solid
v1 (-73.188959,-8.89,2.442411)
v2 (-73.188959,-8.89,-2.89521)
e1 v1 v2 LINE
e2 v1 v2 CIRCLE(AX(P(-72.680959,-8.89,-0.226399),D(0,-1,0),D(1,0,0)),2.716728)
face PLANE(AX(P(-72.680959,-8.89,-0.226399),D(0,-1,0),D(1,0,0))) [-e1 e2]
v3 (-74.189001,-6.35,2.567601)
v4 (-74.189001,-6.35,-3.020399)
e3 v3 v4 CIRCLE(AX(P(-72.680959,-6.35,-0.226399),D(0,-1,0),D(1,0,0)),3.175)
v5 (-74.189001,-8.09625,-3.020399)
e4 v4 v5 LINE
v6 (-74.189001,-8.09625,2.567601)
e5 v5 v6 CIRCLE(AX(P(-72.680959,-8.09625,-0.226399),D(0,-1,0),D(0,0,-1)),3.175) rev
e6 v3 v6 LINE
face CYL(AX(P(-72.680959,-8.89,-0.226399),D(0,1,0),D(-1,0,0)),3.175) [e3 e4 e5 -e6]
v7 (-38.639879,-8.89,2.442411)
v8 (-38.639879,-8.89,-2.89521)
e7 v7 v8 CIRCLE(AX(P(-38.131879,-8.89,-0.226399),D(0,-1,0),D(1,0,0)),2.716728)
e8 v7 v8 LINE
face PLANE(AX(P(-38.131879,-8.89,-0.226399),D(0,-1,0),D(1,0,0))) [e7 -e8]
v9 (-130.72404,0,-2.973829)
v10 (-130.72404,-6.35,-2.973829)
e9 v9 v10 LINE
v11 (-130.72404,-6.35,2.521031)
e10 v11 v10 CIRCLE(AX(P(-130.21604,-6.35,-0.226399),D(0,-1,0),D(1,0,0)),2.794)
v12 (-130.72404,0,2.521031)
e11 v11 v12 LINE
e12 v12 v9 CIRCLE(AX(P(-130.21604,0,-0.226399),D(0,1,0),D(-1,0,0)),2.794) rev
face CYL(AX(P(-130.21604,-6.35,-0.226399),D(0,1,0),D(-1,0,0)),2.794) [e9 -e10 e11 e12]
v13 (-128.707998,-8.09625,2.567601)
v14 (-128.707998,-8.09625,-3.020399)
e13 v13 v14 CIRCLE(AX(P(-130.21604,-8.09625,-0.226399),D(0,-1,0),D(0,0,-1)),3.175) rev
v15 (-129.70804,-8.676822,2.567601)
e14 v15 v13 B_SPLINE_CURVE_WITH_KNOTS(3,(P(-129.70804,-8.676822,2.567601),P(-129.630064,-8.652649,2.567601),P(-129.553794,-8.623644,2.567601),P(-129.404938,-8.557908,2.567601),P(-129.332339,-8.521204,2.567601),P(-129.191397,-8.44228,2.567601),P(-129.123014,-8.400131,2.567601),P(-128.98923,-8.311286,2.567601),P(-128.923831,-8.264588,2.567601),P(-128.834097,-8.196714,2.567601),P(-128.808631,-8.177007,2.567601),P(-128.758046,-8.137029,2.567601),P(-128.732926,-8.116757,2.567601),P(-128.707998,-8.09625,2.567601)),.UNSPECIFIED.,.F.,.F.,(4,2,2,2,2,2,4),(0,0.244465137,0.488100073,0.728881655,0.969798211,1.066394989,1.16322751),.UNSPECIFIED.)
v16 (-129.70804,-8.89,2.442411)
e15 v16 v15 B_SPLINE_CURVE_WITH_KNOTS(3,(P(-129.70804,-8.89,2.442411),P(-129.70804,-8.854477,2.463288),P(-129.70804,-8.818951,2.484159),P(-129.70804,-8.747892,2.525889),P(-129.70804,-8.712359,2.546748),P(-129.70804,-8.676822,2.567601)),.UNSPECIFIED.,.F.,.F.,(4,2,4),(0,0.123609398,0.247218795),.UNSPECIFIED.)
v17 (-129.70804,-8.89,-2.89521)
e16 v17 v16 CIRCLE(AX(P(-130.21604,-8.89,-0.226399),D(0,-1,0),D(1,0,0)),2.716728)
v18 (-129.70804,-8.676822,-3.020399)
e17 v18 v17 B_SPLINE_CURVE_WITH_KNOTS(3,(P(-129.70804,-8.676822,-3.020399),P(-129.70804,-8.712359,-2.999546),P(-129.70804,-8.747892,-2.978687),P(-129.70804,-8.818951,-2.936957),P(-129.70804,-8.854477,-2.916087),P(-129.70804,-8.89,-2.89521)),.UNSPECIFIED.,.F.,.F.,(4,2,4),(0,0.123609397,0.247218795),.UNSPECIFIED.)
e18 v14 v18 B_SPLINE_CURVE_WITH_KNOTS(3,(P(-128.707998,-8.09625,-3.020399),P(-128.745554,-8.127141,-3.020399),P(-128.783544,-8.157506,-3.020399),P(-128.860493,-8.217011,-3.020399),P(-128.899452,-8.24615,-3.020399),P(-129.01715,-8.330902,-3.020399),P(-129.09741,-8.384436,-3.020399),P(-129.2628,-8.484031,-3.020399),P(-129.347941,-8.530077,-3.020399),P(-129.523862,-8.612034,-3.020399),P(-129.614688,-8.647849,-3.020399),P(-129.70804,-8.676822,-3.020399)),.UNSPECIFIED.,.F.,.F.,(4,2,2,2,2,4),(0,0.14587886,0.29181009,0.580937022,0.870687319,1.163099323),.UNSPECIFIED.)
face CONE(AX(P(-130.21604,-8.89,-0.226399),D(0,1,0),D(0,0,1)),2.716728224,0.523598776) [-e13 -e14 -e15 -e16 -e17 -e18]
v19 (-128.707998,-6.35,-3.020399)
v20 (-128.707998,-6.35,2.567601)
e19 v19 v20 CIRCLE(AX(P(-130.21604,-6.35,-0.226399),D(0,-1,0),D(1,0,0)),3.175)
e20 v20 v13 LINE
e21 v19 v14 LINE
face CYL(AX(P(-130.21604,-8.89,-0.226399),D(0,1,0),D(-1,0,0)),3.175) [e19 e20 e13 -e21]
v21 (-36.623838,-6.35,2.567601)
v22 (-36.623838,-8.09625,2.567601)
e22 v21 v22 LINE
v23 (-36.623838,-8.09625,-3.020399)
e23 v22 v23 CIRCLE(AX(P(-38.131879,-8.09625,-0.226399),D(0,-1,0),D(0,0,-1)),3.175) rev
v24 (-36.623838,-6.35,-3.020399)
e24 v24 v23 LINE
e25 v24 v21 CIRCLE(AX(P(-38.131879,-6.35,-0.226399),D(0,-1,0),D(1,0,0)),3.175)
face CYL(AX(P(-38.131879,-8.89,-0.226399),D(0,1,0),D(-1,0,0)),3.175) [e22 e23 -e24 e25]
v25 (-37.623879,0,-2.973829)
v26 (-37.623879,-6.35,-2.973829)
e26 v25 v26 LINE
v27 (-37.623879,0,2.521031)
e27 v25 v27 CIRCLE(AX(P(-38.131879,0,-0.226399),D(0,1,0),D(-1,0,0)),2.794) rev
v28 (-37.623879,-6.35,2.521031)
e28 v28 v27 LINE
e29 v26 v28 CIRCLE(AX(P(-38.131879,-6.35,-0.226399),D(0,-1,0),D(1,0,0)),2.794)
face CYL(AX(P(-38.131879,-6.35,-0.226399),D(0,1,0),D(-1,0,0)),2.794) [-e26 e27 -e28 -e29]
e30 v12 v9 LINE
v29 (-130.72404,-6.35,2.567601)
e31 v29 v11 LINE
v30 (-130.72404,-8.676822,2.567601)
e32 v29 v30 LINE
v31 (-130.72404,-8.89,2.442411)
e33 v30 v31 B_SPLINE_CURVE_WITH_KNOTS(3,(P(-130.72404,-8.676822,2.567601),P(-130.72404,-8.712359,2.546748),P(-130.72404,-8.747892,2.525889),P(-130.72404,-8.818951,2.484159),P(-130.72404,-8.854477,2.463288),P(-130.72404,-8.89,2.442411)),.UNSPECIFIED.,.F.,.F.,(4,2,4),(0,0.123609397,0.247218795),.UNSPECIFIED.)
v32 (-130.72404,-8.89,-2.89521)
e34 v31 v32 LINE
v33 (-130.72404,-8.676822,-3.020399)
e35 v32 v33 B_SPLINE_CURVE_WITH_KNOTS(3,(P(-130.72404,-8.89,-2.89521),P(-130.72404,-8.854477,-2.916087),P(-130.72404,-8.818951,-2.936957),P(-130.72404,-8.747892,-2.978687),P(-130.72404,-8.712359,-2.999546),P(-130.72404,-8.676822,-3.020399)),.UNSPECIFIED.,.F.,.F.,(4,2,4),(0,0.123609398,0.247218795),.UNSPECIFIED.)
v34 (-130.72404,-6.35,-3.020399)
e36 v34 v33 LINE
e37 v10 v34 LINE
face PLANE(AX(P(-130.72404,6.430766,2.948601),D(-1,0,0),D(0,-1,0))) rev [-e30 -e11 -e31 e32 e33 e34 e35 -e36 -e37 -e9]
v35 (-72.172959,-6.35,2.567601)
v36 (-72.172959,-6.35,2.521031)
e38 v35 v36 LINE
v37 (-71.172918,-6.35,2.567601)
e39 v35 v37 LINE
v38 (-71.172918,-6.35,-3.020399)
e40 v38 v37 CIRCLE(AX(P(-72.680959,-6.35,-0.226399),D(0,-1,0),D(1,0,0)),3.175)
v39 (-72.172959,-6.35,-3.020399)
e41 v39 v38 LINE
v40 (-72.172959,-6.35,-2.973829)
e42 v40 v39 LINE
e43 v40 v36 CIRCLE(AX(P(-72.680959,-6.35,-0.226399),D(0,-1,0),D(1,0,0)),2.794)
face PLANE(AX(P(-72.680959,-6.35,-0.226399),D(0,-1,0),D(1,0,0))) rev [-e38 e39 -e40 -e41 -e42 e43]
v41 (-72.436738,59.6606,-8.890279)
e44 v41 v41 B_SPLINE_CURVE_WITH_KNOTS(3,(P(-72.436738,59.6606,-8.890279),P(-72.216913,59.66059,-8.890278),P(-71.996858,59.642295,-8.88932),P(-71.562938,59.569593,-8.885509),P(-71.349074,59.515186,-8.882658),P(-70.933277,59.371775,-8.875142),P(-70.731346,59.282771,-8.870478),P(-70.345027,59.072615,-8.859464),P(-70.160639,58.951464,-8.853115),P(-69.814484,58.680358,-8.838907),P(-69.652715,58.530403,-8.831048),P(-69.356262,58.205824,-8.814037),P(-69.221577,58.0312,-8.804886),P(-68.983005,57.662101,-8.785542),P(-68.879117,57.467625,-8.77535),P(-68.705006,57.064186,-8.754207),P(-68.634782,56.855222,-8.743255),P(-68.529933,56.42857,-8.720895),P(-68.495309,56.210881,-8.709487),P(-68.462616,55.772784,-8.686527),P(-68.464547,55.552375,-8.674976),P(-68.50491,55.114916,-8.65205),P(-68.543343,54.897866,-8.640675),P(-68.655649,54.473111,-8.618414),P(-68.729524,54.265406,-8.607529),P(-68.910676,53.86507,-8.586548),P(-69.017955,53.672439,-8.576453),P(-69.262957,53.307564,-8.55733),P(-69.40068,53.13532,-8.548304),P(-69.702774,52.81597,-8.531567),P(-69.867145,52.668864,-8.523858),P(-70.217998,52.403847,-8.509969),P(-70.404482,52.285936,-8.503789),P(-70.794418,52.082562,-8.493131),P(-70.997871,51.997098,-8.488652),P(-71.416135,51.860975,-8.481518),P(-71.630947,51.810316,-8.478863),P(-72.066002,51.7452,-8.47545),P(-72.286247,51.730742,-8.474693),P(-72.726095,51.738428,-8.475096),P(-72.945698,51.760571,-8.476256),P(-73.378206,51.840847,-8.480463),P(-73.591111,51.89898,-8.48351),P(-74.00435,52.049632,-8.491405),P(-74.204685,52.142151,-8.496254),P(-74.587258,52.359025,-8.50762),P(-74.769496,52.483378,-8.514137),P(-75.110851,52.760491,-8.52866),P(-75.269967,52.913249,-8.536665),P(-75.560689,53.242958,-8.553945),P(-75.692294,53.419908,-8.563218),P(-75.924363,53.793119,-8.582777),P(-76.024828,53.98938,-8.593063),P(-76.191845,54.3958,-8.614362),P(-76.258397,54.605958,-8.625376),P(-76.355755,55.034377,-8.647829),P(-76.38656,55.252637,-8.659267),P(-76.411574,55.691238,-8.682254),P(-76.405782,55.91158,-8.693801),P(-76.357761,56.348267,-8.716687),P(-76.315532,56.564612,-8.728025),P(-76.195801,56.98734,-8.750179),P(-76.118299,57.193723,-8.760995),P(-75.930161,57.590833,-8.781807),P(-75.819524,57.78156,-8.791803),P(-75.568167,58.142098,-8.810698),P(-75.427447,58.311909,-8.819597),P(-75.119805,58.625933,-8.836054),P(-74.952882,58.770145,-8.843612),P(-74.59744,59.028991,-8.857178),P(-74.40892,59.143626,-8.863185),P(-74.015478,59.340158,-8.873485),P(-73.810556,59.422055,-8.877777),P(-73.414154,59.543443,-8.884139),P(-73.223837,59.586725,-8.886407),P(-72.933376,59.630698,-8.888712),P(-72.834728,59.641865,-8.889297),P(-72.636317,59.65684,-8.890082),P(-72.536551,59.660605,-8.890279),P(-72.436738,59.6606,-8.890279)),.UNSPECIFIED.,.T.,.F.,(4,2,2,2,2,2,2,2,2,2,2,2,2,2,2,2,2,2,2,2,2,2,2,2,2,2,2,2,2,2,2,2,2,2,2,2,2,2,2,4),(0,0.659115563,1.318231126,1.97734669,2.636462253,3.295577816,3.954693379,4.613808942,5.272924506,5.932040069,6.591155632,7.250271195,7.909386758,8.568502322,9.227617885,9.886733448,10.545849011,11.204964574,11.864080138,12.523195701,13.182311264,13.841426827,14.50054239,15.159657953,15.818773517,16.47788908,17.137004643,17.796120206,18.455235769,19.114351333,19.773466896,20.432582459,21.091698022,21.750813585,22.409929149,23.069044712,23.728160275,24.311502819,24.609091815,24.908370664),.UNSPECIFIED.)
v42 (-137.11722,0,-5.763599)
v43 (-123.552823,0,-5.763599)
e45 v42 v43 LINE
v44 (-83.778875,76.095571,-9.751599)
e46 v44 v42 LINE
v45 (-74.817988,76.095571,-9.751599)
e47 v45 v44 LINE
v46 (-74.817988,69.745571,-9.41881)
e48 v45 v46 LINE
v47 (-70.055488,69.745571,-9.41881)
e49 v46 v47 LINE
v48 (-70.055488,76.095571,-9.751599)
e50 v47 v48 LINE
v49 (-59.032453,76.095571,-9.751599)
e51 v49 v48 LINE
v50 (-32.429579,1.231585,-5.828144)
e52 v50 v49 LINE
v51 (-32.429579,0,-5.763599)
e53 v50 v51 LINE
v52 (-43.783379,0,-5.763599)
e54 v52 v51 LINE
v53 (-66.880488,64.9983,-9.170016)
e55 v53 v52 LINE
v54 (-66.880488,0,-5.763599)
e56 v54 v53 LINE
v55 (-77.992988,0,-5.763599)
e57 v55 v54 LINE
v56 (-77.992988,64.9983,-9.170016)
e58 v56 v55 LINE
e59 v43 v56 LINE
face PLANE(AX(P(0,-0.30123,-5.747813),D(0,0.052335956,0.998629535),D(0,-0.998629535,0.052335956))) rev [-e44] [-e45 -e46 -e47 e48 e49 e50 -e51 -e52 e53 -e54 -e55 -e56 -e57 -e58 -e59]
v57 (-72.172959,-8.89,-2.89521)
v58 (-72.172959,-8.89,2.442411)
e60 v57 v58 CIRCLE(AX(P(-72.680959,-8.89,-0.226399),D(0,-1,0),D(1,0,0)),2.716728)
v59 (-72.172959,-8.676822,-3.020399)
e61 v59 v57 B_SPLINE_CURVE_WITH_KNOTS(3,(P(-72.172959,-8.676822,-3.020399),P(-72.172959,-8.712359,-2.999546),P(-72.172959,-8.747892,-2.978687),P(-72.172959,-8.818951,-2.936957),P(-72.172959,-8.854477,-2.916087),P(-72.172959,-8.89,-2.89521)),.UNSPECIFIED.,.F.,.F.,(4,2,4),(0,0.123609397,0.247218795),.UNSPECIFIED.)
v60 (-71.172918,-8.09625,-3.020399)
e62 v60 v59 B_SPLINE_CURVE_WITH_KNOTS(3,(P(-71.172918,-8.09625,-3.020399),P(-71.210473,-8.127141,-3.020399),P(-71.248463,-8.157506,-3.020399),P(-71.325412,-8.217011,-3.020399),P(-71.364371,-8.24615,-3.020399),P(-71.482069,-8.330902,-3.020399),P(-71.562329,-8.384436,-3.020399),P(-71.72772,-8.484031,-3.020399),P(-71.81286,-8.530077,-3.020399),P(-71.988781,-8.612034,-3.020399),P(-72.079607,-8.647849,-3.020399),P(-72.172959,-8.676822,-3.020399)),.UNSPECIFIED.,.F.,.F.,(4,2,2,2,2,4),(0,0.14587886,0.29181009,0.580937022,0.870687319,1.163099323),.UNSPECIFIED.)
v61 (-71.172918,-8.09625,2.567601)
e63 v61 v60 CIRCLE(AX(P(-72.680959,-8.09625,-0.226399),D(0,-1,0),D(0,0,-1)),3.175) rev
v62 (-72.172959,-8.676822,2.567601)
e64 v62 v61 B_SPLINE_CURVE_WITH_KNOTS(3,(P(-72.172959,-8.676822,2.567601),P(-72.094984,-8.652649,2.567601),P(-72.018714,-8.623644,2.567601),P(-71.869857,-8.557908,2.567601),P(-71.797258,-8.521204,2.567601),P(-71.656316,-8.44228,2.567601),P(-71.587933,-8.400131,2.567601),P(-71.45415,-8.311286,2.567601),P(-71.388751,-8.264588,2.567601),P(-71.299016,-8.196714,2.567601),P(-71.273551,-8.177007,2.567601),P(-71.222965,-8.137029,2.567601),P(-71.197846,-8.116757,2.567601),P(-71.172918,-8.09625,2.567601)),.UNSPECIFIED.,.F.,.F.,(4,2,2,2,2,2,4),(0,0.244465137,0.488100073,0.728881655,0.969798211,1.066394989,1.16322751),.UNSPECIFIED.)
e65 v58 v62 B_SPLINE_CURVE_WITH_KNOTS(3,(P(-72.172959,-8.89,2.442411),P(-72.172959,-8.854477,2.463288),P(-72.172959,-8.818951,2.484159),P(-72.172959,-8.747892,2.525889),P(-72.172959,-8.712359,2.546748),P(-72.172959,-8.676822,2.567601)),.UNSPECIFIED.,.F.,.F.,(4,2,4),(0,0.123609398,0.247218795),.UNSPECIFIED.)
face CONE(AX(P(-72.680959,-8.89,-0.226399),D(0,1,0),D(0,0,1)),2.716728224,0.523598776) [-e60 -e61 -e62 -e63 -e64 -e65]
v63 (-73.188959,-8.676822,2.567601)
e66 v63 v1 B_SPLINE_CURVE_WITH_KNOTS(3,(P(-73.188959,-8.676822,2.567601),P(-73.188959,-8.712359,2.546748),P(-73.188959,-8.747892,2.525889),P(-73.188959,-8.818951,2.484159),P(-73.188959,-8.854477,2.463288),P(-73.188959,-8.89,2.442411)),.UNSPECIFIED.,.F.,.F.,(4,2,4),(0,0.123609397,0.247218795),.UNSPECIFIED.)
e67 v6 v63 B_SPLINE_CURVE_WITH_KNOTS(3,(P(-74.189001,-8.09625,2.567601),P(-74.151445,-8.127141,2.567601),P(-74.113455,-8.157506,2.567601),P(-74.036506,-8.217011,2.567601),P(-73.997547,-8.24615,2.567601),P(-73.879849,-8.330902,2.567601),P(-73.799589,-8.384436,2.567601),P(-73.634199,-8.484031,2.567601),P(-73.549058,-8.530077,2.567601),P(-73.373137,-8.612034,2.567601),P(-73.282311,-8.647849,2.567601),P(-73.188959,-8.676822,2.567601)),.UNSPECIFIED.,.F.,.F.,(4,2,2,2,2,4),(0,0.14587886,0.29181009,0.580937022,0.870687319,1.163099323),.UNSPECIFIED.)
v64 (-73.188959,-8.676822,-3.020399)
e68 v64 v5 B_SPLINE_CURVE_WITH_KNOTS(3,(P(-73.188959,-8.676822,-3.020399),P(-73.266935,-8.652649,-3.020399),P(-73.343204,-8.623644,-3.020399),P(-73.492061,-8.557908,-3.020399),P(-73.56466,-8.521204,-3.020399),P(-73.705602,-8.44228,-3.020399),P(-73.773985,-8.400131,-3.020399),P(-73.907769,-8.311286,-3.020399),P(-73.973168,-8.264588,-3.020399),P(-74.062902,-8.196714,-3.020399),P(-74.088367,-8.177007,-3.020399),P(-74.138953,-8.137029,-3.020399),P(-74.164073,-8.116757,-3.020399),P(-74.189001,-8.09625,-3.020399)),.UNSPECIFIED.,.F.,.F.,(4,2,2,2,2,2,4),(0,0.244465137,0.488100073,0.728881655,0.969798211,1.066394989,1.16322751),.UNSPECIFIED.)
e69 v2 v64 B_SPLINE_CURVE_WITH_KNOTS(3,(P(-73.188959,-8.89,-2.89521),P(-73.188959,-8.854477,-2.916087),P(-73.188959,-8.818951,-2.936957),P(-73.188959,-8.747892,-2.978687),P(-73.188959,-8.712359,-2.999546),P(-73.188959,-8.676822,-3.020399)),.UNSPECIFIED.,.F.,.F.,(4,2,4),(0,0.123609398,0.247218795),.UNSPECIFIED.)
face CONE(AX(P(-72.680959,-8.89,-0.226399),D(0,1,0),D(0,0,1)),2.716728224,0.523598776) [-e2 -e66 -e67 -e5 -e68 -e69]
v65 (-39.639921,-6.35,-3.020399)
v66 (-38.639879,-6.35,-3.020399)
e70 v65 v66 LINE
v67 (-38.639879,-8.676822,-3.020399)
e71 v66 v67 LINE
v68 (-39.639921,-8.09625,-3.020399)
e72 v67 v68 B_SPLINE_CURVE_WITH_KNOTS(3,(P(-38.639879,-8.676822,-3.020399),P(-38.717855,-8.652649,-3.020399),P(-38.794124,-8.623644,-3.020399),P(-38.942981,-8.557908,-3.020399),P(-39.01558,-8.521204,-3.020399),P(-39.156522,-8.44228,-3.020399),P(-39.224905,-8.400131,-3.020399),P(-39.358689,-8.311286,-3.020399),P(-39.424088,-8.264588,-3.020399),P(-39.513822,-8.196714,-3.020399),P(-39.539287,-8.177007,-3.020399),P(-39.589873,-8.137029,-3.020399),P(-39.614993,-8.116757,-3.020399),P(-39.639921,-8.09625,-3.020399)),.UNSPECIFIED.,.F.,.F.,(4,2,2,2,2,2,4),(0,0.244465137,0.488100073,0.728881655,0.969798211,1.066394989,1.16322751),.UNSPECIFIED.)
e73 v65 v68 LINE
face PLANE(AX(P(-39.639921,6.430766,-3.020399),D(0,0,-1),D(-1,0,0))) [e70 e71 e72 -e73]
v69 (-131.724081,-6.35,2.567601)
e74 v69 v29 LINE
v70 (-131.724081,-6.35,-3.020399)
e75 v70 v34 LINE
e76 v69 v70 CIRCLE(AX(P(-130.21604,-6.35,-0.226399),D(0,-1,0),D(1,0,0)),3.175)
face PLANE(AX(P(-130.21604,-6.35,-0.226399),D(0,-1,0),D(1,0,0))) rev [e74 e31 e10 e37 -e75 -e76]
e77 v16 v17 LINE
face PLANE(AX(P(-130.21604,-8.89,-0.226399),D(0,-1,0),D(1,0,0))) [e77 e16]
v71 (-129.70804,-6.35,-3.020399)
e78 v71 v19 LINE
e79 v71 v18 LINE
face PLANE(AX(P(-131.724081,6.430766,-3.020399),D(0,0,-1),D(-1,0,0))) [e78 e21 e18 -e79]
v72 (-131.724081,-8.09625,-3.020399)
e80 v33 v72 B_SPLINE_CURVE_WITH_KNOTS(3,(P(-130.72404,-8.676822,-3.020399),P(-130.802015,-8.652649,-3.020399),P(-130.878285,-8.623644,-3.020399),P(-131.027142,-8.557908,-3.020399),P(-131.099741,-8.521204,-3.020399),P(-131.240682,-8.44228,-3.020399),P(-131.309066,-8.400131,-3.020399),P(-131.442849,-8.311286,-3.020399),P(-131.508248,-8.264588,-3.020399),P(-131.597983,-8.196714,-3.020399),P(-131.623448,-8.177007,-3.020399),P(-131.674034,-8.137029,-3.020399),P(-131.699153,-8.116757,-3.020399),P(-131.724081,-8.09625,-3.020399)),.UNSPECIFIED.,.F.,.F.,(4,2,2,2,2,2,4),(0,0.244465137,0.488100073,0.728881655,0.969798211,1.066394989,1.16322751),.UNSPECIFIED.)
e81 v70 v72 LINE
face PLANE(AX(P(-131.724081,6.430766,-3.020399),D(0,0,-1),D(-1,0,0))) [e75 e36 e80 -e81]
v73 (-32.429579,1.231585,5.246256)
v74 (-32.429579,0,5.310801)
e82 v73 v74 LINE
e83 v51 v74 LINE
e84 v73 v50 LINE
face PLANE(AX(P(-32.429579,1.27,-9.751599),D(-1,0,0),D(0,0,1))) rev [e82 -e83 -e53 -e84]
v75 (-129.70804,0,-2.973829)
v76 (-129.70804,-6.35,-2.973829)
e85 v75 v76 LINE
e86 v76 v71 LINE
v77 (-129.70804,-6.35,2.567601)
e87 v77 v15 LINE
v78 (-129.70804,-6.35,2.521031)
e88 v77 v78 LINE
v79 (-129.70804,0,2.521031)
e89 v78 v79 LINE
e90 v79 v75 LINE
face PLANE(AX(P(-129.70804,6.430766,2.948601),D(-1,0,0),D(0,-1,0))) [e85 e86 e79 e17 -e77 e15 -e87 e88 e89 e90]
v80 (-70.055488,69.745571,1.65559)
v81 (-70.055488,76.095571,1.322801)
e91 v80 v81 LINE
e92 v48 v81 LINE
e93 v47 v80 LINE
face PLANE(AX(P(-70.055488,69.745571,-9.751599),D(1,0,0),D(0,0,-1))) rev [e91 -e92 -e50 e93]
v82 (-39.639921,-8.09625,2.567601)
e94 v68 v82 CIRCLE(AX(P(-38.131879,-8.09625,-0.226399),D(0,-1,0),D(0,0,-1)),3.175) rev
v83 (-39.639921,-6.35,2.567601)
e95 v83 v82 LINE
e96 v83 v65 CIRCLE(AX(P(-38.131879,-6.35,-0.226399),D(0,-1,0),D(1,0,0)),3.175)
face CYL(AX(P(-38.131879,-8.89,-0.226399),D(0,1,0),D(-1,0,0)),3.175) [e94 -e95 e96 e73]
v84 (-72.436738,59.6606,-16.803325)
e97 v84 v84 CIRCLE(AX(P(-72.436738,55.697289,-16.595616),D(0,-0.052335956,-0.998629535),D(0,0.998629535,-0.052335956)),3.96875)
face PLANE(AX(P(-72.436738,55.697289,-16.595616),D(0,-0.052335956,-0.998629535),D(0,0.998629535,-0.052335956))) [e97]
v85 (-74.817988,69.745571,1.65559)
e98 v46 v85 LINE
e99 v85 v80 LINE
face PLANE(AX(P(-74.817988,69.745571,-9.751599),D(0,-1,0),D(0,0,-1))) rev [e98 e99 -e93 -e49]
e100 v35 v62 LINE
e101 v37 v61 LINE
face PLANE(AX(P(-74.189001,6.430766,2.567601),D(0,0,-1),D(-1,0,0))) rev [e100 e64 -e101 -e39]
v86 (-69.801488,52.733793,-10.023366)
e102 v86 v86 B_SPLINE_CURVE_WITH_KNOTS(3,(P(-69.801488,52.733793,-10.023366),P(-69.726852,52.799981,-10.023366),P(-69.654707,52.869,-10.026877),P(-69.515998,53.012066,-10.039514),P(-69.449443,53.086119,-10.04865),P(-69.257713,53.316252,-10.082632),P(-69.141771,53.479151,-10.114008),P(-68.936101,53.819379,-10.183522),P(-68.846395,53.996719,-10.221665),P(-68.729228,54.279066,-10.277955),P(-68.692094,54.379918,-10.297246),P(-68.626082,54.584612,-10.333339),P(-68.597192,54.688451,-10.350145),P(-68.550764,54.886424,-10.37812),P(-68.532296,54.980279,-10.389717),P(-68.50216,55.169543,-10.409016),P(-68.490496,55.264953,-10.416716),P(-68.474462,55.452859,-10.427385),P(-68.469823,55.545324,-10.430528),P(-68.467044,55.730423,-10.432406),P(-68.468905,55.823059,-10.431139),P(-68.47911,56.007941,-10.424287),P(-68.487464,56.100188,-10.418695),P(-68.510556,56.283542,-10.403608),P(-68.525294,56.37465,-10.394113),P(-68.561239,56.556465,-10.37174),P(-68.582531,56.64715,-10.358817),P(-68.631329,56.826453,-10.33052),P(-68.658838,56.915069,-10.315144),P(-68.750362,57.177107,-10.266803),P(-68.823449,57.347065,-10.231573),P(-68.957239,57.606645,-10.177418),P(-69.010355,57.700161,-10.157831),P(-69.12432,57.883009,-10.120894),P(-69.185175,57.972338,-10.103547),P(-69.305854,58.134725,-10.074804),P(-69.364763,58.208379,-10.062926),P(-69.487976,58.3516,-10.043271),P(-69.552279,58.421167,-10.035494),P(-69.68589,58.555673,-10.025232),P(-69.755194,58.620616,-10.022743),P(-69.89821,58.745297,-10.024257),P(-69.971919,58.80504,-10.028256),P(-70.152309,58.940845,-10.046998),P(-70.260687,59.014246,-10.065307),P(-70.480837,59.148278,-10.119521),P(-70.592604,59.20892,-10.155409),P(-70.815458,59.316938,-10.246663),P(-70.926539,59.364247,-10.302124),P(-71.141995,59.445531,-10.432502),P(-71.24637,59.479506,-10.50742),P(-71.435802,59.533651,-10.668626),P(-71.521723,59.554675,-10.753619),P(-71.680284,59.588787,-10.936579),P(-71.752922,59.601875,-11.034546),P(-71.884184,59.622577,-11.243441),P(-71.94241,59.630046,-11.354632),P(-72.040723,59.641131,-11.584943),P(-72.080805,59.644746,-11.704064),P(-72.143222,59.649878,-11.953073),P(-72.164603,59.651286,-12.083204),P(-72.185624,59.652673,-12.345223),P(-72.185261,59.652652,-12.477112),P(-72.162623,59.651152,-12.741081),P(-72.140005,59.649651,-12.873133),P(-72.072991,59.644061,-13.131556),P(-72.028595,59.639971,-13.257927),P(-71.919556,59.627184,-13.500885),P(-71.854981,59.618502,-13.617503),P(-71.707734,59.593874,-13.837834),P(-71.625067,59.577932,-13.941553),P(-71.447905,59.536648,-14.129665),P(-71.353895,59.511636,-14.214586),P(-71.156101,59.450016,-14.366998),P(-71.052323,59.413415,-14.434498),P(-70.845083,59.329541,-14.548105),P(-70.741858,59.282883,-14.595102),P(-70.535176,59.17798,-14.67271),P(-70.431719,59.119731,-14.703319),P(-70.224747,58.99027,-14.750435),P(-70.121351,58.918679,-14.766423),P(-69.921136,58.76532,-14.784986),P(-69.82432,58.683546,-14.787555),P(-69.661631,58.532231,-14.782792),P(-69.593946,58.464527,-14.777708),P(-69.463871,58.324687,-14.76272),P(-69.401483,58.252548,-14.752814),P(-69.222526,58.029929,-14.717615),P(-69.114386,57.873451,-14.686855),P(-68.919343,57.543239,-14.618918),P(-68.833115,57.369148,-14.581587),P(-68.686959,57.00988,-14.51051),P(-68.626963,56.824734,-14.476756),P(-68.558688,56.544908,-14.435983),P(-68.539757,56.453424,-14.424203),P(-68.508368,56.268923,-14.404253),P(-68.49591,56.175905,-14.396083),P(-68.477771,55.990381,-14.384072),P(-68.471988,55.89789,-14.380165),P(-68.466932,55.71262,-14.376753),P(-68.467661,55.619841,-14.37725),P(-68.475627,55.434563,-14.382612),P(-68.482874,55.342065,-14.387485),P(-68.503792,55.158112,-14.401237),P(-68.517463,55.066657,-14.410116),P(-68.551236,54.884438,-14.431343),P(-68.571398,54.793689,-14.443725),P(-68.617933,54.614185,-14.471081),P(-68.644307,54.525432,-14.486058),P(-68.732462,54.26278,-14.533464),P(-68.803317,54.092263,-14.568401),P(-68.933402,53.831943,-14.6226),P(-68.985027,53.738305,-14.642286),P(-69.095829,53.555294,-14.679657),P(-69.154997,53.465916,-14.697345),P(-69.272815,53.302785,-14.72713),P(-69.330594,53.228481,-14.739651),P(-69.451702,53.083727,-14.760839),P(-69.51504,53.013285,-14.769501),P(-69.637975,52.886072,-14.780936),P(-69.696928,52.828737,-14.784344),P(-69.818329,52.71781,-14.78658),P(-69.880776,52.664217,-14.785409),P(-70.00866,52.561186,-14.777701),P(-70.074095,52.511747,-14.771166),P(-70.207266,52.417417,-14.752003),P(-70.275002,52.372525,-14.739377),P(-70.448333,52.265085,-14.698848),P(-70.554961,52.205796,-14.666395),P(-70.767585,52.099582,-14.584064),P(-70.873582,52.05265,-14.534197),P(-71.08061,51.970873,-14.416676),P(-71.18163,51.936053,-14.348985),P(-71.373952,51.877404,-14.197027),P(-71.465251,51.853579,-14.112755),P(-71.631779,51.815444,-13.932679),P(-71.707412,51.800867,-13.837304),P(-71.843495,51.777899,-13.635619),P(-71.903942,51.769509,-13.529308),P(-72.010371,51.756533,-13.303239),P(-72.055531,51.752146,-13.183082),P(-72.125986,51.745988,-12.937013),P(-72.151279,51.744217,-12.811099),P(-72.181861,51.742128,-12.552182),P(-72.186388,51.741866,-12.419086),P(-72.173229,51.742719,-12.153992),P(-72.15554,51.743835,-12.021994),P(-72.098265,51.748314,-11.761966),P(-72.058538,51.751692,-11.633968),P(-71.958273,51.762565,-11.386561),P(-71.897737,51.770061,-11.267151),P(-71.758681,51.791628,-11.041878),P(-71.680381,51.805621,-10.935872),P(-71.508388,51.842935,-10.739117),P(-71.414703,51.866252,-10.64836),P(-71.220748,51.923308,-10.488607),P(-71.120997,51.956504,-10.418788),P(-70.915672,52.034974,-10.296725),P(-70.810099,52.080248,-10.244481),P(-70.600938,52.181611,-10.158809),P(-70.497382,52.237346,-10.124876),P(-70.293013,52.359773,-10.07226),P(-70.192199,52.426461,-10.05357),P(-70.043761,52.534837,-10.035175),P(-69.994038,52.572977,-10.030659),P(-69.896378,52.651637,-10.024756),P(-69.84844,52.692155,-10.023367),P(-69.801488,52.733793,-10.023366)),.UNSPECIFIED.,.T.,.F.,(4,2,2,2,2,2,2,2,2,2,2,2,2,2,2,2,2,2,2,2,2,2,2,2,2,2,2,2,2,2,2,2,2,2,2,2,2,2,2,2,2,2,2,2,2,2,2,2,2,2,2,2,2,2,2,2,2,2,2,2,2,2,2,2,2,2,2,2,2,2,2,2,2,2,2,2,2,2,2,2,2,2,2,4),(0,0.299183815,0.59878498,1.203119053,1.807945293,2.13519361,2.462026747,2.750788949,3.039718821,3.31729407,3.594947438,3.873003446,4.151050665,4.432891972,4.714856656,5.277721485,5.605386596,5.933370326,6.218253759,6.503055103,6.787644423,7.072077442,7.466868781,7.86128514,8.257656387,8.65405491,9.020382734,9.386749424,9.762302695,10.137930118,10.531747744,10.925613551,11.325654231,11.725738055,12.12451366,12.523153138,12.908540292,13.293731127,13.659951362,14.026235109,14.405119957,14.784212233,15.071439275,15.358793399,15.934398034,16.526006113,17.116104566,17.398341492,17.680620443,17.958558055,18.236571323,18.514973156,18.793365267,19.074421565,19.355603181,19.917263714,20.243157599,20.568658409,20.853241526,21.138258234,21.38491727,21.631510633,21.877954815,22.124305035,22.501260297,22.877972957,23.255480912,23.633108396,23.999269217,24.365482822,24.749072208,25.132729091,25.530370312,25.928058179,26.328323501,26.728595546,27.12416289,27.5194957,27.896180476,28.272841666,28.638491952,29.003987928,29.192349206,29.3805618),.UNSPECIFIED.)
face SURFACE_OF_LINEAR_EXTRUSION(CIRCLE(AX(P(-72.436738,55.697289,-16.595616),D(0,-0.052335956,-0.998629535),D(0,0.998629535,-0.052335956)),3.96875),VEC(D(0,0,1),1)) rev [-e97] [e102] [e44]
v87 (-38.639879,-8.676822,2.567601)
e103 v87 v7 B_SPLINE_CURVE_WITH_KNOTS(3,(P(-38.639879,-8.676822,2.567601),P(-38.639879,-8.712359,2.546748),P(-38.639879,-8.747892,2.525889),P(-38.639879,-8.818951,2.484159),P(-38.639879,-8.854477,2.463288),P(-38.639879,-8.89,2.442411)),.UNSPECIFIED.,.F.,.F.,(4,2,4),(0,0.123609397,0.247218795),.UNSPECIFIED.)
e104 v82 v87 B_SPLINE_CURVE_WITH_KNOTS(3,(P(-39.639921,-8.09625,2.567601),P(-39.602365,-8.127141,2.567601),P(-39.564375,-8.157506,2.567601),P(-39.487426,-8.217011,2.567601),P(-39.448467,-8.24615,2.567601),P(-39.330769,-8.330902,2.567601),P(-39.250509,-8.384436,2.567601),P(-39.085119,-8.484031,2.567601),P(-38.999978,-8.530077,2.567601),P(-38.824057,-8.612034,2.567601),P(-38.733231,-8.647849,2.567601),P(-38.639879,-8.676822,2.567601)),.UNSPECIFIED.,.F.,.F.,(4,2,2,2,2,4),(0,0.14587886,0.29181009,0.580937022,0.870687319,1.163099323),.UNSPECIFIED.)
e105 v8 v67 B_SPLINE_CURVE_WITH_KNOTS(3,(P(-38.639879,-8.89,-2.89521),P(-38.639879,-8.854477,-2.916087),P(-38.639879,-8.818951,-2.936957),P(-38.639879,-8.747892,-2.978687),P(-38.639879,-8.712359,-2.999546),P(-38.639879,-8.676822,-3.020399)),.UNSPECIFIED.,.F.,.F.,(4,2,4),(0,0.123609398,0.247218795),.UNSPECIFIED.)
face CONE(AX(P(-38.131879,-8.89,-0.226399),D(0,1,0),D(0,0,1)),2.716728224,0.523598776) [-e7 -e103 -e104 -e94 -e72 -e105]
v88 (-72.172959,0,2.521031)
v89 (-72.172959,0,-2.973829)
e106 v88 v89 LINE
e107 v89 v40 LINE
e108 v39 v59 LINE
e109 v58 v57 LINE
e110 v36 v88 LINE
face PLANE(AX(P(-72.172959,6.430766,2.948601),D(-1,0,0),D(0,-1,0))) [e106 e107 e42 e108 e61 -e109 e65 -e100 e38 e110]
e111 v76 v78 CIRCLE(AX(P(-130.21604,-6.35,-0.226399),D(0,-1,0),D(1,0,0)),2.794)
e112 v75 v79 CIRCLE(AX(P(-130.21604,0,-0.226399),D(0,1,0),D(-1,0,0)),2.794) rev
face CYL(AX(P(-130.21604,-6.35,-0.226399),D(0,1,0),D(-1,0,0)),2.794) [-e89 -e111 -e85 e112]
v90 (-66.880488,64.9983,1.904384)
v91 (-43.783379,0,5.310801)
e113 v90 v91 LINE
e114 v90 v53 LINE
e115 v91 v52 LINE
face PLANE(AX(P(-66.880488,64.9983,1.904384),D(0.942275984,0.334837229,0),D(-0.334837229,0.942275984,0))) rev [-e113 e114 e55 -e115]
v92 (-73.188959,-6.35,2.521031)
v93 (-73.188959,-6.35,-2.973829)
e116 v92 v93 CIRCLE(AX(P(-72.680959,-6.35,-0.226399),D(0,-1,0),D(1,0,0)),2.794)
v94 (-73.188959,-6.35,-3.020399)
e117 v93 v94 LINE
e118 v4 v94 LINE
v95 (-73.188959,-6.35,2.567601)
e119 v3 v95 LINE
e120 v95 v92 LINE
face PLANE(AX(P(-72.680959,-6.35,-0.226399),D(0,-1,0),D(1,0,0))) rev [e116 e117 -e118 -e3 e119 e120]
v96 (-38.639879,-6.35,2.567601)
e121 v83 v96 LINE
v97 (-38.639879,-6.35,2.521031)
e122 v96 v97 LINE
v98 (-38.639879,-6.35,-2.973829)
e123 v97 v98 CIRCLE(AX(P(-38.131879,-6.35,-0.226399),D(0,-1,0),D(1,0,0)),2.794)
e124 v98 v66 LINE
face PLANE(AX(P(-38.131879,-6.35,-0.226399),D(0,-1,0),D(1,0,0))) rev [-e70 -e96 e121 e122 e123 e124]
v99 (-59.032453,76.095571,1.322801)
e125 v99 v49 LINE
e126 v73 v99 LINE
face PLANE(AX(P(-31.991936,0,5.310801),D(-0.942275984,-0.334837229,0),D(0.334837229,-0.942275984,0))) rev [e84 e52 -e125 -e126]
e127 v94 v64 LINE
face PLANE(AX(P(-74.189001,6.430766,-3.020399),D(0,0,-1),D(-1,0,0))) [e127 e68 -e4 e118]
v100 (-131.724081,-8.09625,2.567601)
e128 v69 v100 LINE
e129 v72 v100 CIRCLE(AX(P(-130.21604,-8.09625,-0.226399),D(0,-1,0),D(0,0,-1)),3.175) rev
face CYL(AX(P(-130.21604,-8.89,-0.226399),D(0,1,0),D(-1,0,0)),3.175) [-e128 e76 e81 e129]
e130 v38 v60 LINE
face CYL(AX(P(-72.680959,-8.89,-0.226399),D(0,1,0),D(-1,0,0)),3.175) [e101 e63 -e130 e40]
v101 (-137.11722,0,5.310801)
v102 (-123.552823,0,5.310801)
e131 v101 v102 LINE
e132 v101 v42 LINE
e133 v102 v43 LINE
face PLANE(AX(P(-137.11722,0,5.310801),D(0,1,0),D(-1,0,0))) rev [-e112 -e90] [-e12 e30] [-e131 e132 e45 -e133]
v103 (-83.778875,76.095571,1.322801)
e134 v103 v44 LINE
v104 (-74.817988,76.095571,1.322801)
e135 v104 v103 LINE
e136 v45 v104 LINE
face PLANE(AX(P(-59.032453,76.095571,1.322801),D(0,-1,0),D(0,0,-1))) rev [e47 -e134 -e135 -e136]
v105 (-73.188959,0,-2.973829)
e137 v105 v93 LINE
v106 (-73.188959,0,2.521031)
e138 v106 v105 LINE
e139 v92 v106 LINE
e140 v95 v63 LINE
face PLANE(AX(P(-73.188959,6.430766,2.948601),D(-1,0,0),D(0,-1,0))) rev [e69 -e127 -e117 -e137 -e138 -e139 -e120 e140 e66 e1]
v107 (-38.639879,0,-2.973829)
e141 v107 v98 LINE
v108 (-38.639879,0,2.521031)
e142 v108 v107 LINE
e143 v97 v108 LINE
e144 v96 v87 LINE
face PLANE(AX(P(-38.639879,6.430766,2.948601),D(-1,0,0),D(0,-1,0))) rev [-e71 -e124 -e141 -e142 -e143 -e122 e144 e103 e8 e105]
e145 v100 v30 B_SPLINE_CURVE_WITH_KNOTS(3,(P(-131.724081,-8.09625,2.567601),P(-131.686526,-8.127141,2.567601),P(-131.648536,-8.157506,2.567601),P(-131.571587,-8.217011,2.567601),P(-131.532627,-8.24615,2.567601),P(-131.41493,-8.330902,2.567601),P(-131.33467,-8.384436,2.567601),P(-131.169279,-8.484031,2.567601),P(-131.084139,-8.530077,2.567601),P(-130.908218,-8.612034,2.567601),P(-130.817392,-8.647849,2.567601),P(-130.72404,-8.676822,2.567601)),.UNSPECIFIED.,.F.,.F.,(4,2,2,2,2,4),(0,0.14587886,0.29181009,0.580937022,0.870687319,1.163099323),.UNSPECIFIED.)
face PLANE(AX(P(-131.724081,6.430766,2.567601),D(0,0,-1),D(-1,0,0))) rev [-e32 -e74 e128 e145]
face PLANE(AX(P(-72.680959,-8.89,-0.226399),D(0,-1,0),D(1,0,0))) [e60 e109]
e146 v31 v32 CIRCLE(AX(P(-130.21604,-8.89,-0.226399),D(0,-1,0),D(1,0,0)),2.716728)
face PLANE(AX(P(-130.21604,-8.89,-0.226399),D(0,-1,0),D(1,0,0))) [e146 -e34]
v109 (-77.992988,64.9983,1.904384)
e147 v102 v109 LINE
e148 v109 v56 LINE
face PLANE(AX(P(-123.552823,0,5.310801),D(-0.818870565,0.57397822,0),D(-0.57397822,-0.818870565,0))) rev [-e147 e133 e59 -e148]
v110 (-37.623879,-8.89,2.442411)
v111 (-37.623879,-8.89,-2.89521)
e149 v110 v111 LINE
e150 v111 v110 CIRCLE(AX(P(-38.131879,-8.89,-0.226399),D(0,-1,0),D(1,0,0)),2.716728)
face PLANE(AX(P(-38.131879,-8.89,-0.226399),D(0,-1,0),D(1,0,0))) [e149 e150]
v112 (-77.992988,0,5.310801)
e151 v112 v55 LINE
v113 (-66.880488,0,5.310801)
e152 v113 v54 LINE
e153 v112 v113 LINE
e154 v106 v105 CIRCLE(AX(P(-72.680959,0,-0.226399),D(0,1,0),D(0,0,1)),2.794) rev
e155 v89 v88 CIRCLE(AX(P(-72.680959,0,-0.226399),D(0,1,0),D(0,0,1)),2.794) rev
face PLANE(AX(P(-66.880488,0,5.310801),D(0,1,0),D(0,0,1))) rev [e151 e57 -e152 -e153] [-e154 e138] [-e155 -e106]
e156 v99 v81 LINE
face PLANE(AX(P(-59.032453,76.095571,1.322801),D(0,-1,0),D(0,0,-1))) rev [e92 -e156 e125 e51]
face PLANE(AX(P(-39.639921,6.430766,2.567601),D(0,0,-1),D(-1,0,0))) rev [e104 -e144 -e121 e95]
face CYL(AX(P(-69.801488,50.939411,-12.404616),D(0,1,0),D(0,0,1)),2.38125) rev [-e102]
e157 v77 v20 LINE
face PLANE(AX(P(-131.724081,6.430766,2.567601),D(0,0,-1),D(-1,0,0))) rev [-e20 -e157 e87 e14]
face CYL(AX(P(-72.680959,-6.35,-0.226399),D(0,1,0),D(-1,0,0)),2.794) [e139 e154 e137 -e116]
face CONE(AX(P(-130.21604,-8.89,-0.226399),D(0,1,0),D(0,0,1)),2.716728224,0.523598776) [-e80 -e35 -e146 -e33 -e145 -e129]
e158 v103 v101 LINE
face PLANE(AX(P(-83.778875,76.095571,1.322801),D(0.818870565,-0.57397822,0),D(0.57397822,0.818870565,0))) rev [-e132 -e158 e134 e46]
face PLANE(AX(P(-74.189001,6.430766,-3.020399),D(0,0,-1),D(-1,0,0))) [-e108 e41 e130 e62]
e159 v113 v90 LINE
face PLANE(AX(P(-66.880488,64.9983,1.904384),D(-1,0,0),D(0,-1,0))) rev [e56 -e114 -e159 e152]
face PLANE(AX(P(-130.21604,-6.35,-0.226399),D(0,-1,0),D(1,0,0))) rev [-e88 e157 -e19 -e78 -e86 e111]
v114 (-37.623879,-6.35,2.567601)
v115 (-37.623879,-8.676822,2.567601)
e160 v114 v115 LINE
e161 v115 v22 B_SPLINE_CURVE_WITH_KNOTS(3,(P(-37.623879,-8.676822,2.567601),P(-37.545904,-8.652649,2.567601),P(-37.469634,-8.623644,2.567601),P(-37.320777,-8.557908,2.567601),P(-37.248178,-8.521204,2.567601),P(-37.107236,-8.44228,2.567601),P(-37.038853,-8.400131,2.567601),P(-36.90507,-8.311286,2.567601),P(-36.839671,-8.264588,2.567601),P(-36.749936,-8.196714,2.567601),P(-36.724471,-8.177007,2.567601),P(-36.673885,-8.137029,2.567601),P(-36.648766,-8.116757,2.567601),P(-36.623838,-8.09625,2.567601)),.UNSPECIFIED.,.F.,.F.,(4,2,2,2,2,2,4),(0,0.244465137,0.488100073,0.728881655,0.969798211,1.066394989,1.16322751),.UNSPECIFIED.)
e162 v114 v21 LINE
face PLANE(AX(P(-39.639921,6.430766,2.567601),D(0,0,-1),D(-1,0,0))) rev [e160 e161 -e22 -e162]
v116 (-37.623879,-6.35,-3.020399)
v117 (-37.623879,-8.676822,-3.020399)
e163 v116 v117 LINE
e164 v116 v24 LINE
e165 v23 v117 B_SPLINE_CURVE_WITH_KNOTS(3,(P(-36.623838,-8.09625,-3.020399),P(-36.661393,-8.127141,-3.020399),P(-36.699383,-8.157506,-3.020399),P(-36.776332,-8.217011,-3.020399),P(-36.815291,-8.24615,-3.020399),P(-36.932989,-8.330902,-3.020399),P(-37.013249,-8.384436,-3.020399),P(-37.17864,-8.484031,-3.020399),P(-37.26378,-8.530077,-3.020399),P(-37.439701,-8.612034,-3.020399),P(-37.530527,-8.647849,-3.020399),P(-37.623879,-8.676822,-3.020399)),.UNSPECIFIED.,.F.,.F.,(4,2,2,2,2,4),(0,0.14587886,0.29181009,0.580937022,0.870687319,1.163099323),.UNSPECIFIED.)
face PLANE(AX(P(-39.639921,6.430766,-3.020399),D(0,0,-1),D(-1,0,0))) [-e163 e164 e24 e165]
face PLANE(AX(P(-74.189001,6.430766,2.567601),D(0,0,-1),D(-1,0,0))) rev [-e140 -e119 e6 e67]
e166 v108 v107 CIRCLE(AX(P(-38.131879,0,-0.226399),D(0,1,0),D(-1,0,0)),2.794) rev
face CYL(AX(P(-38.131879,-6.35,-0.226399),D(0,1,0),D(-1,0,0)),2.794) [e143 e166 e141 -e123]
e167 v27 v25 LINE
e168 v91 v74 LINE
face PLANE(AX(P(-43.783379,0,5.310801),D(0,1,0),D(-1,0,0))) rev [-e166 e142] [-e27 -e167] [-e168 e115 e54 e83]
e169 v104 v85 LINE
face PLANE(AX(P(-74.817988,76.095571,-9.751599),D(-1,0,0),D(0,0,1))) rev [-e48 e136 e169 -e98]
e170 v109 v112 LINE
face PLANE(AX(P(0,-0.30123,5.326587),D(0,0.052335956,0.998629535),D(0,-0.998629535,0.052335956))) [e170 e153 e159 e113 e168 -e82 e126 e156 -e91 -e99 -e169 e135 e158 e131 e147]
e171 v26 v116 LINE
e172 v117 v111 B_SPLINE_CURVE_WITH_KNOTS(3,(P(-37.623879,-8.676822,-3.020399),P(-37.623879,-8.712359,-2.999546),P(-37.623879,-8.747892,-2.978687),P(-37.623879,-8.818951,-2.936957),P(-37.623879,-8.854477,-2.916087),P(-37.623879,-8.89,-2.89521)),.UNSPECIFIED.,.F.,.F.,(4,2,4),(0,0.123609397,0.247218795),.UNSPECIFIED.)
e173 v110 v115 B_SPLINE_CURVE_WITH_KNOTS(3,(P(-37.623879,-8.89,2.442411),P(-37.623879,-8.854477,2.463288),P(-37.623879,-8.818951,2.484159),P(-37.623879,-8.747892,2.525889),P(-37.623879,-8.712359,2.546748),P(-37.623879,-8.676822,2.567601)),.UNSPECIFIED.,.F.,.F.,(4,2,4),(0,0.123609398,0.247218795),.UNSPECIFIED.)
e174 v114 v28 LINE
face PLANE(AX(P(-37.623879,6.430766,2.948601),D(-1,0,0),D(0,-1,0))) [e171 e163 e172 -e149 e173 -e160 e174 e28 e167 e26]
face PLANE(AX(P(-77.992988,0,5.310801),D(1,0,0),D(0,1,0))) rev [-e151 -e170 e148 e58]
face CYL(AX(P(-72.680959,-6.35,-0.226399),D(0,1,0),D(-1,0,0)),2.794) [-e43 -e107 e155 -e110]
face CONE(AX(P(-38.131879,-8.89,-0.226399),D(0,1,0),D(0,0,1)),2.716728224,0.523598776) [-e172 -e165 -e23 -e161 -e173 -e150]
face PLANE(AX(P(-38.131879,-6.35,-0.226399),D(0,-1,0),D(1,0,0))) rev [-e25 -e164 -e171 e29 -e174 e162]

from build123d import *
from OCP.BRepFilletAPI import BRepFilletAPI_MakeChamfer

# Parameters (mm, degrees)
BOSS_EXTRUDE2_DEPTH     = 11.0744
CUT_EXTRUDE1_DEPTH      = 158.120213562
CUT_EXTRUDE1_DEPTH_BACK = 158.120213562
SKETCH3_W               = 4.7625
SKETCH3_H               = 6.35
CUT_EXTRUDE6_DEPTH      = 158.120213562
CUT_EXTRUDE6_DEPTH_BACK = 158.120213562
SKETCH12_W              = 1.27
SKETCH12_H              = 1.27
SKETCH12_W_2            = 12.7
SKETCH12_H_2            = 12.7
SKETCH13_R              = 2.794
BOSS_EXTRUDE3_DEPTH     = 6.35
SKETCH14_R              = 3.175
BOSS_EXTRUDE4_DEPTH     = 2.54
CUT_EXTRUDE7_REACH      = 163.613
SKETCH15_W              = 1.016
SKETCH15_H              = 6.35
SKETCH15_W_2            = 3.01608289
SKETCH15_H_2            = 0.381
SKETCH17_R              = 3.96875
BOSS_EXTRUDE5_DEPTH     = 16.44396
SKETCH18_R              = 2.38125
CUT_EXTRUDE9_DEPTH      = 5.334
CHAMFER1_SIZE           = 0.79375
CHAMFER1_SIZE2          = 0.458271776
SKETCH19_W              = 6.0325
SKETCH19_H              = 64.754314085
BOSS_EXTRUDE11_DEPTH    = 8.542621607


with BuildPart() as part:
    # Sketch2 → Boss-Extrude2 (new, along a direction that is not the sketch's normal)
    with BuildSketch(Plane(origin=(0, -0.301230094, -5.747812595), x_dir=(1, 0, 0), z_dir=(0, 0.05233595624294042, 0.998629534754574))):
        Polygon((-31.991936044, 0.301643486), (-59.03245329, 76.501643486), (-83.778875482, 76.501643486), (-137.117219796, 0.301643486), (-123.552823331, 0.301643486), (-77.992987563, 65.389143486), (-77.992987563, 0.301643486), (-66.880487563, 0.301643486), (-66.880487563, 65.389143486), (-43.783379083, 0.301643486), align=None)
    extrude(amount=BOSS_EXTRUDE2_DEPTH, dir=(0, 0, 1))

    # Sketch3 → Cut-Extrude1 (cut, two sides: drawn at the far end of the back side and taken through both)
    with BuildSketch(Plane.XY.offset(-CUT_EXTRUDE1_DEPTH_BACK)):
        with Locations((-72.436737563, 72.920570548)):
            Rectangle(SKETCH3_W, SKETCH3_H)
    extrude(amount=CUT_EXTRUDE1_DEPTH + CUT_EXTRUDE1_DEPTH_BACK, mode=Mode.SUBTRACT)

    # Sketch12 → Cut-Extrude6 (cut, two sides: drawn at the far end of the back side and taken through both)
    with BuildSketch(Plane.XY.offset(-CUT_EXTRUDE6_DEPTH_BACK)):
        with Locations((-31.794579083, 0.635)):
            Rectangle(SKETCH12_W, SKETCH12_H)
        with Locations((-144.340183331, 6.35)):
            Rectangle(SKETCH12_W_2, SKETCH12_H_2)
    extrude(amount=CUT_EXTRUDE6_DEPTH + CUT_EXTRUDE6_DEPTH_BACK, mode=Mode.SUBTRACT)

    # Shell13: read off the stored shape, not the designer's step
    # Shell13: loft between two sections, ruled curve by curve
    shell13_from = [
        Edge.make_line((-67.225707879, 73.555570548, -9.618483502), (-41.990365712, 2.54, -5.896715155)),
        Edge.make_line((-35.590124494, 2.54, -5.896715155), (-60.82546666, 73.555570548, -9.618483502)),
        Edge.make_line((-41.990365712, 2.54, -5.896715155), (-35.590124494, 2.54, -5.896715155)),
        Edge.make_line((-60.82546666, 73.555570548, -9.618483502), (-67.225707879, 73.555570548, -9.618483502)),
    ]
    shell13_to = [
        Edge.make_line((-67.225707879, 73.555570548, -1.087569261), (-41.990365712, 2.54, 2.634199086)),
        Edge.make_line((-35.590124494, 2.54, 2.634199086), (-60.82546666, 73.555570548, -1.087569261)),
        Edge.make_line((-41.990365712, 2.54, 2.634199086), (-35.590124494, 2.54, 2.634199086)),
        Edge.make_line((-60.82546666, 73.555570548, -1.087569261), (-67.225707879, 73.555570548, -1.087569261)),
    ]
    shell13 = Solid(Shell([*[Face.make_surface_from_curves(shell13_from[k], shell13_to[k]) for k in range(4)], Face(Wire(shell13_from)), Face(Wire(shell13_to))]))
    add(shell13, mode=Mode.SUBTRACT)

    # Shell13 2: loft between two sections, ruled curve by curve
    shell13_2_from = [
        Edge.make_line((-75.452987563, 2.54, -5.896715155), (-69.420487563, 2.54, -5.896715155)),
        Edge.make_line((-75.452987563, 67.205570548, -9.285694103), (-69.420487563, 67.205570548, -9.285694103)),
        Edge.make_line((-69.420487563, 2.54, -5.896715155), (-69.420487563, 67.205570548, -9.285694103)),
        Edge.make_line((-75.452987563, 67.205570548, -9.285694103), (-75.452987563, 2.54, -5.896715155)),
    ]
    shell13_2_to = [
        Edge.make_line((-75.452987563, 2.54, 2.634199086), (-69.420487563, 2.54, 2.634199086)),
        Edge.make_line((-75.452987563, 67.205570548, -0.754779862), (-69.420487563, 67.205570548, -0.754779862)),
        Edge.make_line((-69.420487563, 2.54, 2.634199086), (-69.420487563, 67.205570548, -0.754779862)),
        Edge.make_line((-75.452987563, 67.205570548, -0.754779862), (-75.452987563, 2.54, 2.634199086)),
    ]
    shell13_2 = Solid(Shell([*[Face.make_surface_from_curves(shell13_2_from[k], shell13_2_to[k]) for k in range(4)], Face(Wire(shell13_2_from)), Face(Wire(shell13_2_to))]))
    add(shell13_2, mode=Mode.SUBTRACT)

    # Shell13 3: loft between two sections, ruled curve by curve
    shell13_3_from = [
        Edge.make_line((-132.235001715, 2.54, -5.896715155), (-124.87427188, 2.54, -5.896715155)),
        Edge.make_line((-82.457426933, 73.555570548, -9.618483502), (-77.357987563, 73.555570548, -9.618483502)),
        Edge.make_line((-82.457426933, 73.555570548, -9.618483502), (-132.235001715, 2.54, -5.896715155)),
        Edge.make_line((-124.87427188, 2.54, -5.896715155), (-77.357987563, 70.329482632, -9.449411398)),
        Edge.make_line((-77.357987563, 70.329482632, -9.449411398), (-77.357987563, 73.555570548, -9.618483502)),
    ]
    shell13_3_to = [
        Edge.make_line((-132.235001715, 2.54, 2.634199086), (-124.87427188, 2.54, 2.634199086)),
        Edge.make_line((-82.457426933, 73.555570548, -1.087569261), (-77.357987563, 73.555570548, -1.087569261)),
        Edge.make_line((-82.457426933, 73.555570548, -1.087569261), (-132.235001715, 2.54, 2.634199086)),
        Edge.make_line((-124.87427188, 2.54, 2.634199086), (-77.357987563, 70.329482632, -0.918497157)),
        Edge.make_line((-77.357987563, 70.329482632, -0.918497157), (-77.357987563, 73.555570548, -1.087569261)),
    ]
    shell13_3 = Solid(Shell([*[Face.make_surface_from_curves(shell13_3_from[k], shell13_3_to[k]) for k in range(5)], Face(Wire(shell13_3_from)), Face(Wire(shell13_3_to))]))
    add(shell13_3, mode=Mode.SUBTRACT)

    # Sketch13 → Boss-Extrude3 (add)
    with BuildSketch(Plane.XZ):
        with Locations(Location((-130.216039796, -0.226399396, 0), (0, 0, 180))):
            Circle(SKETCH13_R)
        with Locations(Location((-72.680959083, -0.226399396, 0), (0, 0, 90))):
            Circle(SKETCH13_R)
        with Locations(Location((-38.131879083, -0.226399396, 0), (0, 0, 180))):
            Circle(SKETCH13_R)
    extrude(amount=BOSS_EXTRUDE3_DEPTH)

    # Sketch14 → Boss-Extrude4 (add)
    with BuildSketch(Plane.XZ.offset(6.35)):
        with Locations((-130.216039796, -0.226399396)):
            Circle(SKETCH14_R)
        with Locations((-72.680959083, -0.226399396)):
            Circle(SKETCH14_R)
        with Locations((-38.131879083, -0.226399396)):
            Circle(SKETCH14_R)
    extrude(amount=BOSS_EXTRUDE4_DEPTH)

    # Cut-Extrude7: up to this face of the body (flat: up to its plane)
    cut_extrude7_end = Plane(part.part.faces().sort_by_distance((-136.942109777, 0, -0.226399396))[0])
    # Sketch15 → Cut-Extrude7 (cut, up to the picked face)
    with BuildSketch(Plane.XZ.offset(8.89), mode=Mode.PRIVATE) as cut_extrude7_sk1:
        with Locations((-130.216039796, -0.226399396)):
            Rectangle(SKETCH15_W, SKETCH15_H)
    cut_extrude7_tool1 = split(extrude(cut_extrude7_sk1.sketch, amount=-CUT_EXTRUDE7_REACH, mode=Mode.PRIVATE), bisect_by=cut_extrude7_end, keep=Keep.BOTH, mode=Mode.PRIVATE)
    # Sketch15 → Cut-Extrude7 (cut, up to the picked face)
    with BuildSketch(Plane.XZ.offset(8.89), mode=Mode.PRIVATE) as cut_extrude7_sk2:
        with Locations((-72.680959083, -0.226399396)):
            Rectangle(SKETCH15_W, SKETCH15_H)
    cut_extrude7_tool2 = split(extrude(cut_extrude7_sk2.sketch, amount=-CUT_EXTRUDE7_REACH, mode=Mode.PRIVATE), bisect_by=cut_extrude7_end, keep=Keep.BOTH, mode=Mode.PRIVATE)
    # Sketch15 → Cut-Extrude7 (cut, up to the picked face)
    with BuildSketch(Plane.XZ.offset(8.89), mode=Mode.PRIVATE) as cut_extrude7_sk3:
        with Locations((-38.131879083, -0.226399396)):
            Rectangle(SKETCH15_W, SKETCH15_H)
    cut_extrude7_tool3 = split(extrude(cut_extrude7_sk3.sketch, amount=-CUT_EXTRUDE7_REACH, mode=Mode.PRIVATE), bisect_by=cut_extrude7_end, keep=Keep.BOTH, mode=Mode.PRIVATE)
    # Sketch15 → Cut-Extrude7 (cut, up to the picked face)
    with BuildSketch(Plane.XZ.offset(8.89), mode=Mode.PRIVATE) as cut_extrude7_sk4:
        with Locations((-130.216039796, 2.758100604)):
            Rectangle(SKETCH15_W_2, SKETCH15_H_2)
    cut_extrude7_tool4 = split(extrude(cut_extrude7_sk4.sketch, amount=-CUT_EXTRUDE7_REACH, mode=Mode.PRIVATE), bisect_by=cut_extrude7_end, keep=Keep.BOTH, mode=Mode.PRIVATE)
    # Sketch15 → Cut-Extrude7 (cut, up to the picked face)
    with BuildSketch(Plane.XZ.offset(8.89), mode=Mode.PRIVATE) as cut_extrude7_sk5:
        with Locations((-130.216039796, -3.210899396)):
            Rectangle(SKETCH15_W_2, SKETCH15_H_2)
    cut_extrude7_tool5 = split(extrude(cut_extrude7_sk5.sketch, amount=-CUT_EXTRUDE7_REACH, mode=Mode.PRIVATE), bisect_by=cut_extrude7_end, keep=Keep.BOTH, mode=Mode.PRIVATE)
    # Sketch15 → Cut-Extrude7 (cut, up to the picked face)
    with BuildSketch(Plane.XZ.offset(8.89), mode=Mode.PRIVATE) as cut_extrude7_sk6:
        with Locations((-72.680959083, 2.758100604)):
            Rectangle(SKETCH15_W_2, SKETCH15_H_2)
    cut_extrude7_tool6 = split(extrude(cut_extrude7_sk6.sketch, amount=-CUT_EXTRUDE7_REACH, mode=Mode.PRIVATE), bisect_by=cut_extrude7_end, keep=Keep.BOTH, mode=Mode.PRIVATE)
    # Sketch15 → Cut-Extrude7 (cut, up to the picked face)
    with BuildSketch(Plane.XZ.offset(8.89), mode=Mode.PRIVATE) as cut_extrude7_sk7:
        with Locations((-72.680959083, -3.210899396)):
            Rectangle(SKETCH15_W_2, SKETCH15_H_2)
    cut_extrude7_tool7 = split(extrude(cut_extrude7_sk7.sketch, amount=-CUT_EXTRUDE7_REACH, mode=Mode.PRIVATE), bisect_by=cut_extrude7_end, keep=Keep.BOTH, mode=Mode.PRIVATE)
    # Sketch15 → Cut-Extrude7 (cut, up to the picked face)
    with BuildSketch(Plane.XZ.offset(8.89), mode=Mode.PRIVATE) as cut_extrude7_sk8:
        with Locations((-38.131879083, -3.210899396)):
            Rectangle(SKETCH15_W_2, SKETCH15_H_2)
    cut_extrude7_tool8 = split(extrude(cut_extrude7_sk8.sketch, amount=-CUT_EXTRUDE7_REACH, mode=Mode.PRIVATE), bisect_by=cut_extrude7_end, keep=Keep.BOTH, mode=Mode.PRIVATE)
    # Sketch15 → Cut-Extrude7 (cut, up to the picked face)
    with BuildSketch(Plane.XZ.offset(8.89), mode=Mode.PRIVATE) as cut_extrude7_sk9:
        with Locations((-38.131879083, 2.758100604)):
            Rectangle(SKETCH15_W_2, SKETCH15_H_2)
    cut_extrude7_tool9 = split(extrude(cut_extrude7_sk9.sketch, amount=-CUT_EXTRUDE7_REACH, mode=Mode.PRIVATE), bisect_by=cut_extrude7_end, keep=Keep.BOTH, mode=Mode.PRIVATE)
    add(cut_extrude7_tool1.solids().sort_by(Axis((-130.21604, -8.89, -0.226399), (0, 1, 0)))[0], mode=Mode.SUBTRACT)
    add(cut_extrude7_tool2.solids().sort_by(Axis((-72.680959, -8.89, -0.226399), (0, 1, 0)))[0], mode=Mode.SUBTRACT)
    add(cut_extrude7_tool3.solids().sort_by(Axis((-38.131879, -8.89, -0.226399), (0, 1, 0)))[0], mode=Mode.SUBTRACT)
    add(cut_extrude7_tool4.solids().sort_by(Axis((-130.21604, -8.89, 2.758101), (0, 1, 0)))[0], mode=Mode.SUBTRACT)
    add(cut_extrude7_tool5.solids().sort_by(Axis((-130.21604, -8.89, -3.210899), (0, 1, 0)))[0], mode=Mode.SUBTRACT)
    add(cut_extrude7_tool6.solids().sort_by(Axis((-72.680959, -8.89, 2.758101), (0, 1, 0)))[0], mode=Mode.SUBTRACT)
    add(cut_extrude7_tool7.solids().sort_by(Axis((-72.680959, -8.89, -3.210899), (0, 1, 0)))[0], mode=Mode.SUBTRACT)
    add(cut_extrude7_tool8.solids().sort_by(Axis((-38.131879, -8.89, -3.210899), (0, 1, 0)))[0], mode=Mode.SUBTRACT)
    add(cut_extrude7_tool9.solids().sort_by(Axis((-38.131879, -8.89, 2.758101), (0, 1, 0)))[0], mode=Mode.SUBTRACT)

    # Sketch17 → Boss-Extrude5 (add, along a direction that is not the sketch's normal)
    with BuildSketch(Plane(origin=(0, 0.144631584, 2.759735025), x_dir=(-1, 0, 0), z_dir=(0, -0.052335956242940435, -0.998629534754574))):
        with Locations((72.436737563, 55.628895348)):
            Circle(SKETCH17_R)
    extrude(amount=BOSS_EXTRUDE5_DEPTH, dir=(0, 0, -1))

    # Sketch18 → Cut-Extrude9 (cut, symmetric)
    with BuildSketch(Plane(origin=(0, 56.273410548, 0), x_dir=(1, 0, 0), z_dir=(0, 1, 0))):
        with Locations((-69.801487563, 12.404616407)):
            Circle(SKETCH18_R)
    extrude(amount=CUT_EXTRUDE9_DEPTH, both=True, mode=Mode.SUBTRACT)

    # Chamfer1: one chamfer whose edges measure the first distance from different faces: ONE call of the kernel's chamfer builder (chamfer() names one face for all edges)
    chamfer1_edges_1 = [part.edges().sort_by_distance(p)[0] for p in [
        (-133.391039796, -8.89, -0.226399396),
    ]]
    chamfer1_side_1 = [part.faces().sort_by_distance(p)[0] for p in [
        (-133.391039796, -7.62, -0.226399396),
    ]]
    chamfer1_edges_2 = [part.edges().sort_by_distance(p)[0] for p in [
        (-127.041039796, -8.89, -0.226399396),
    ]]
    chamfer1_side_2 = [part.faces().sort_by_distance(p)[0] for p in [
        (-127.041039796, -7.62, -0.226399396),
    ]]
    chamfer1_edges_3 = [part.edges().sort_by_distance(p)[0] for p in [
        (-75.855959083, -8.89, -0.226399396),
    ]]
    chamfer1_side_3 = [part.faces().sort_by_distance(p)[0] for p in [
        (-75.855959083, -7.62, -0.226399396),
    ]]
    chamfer1_edges_4 = [part.edges().sort_by_distance(p)[0] for p in [
        (-69.505959083, -8.89, -0.226399396),
    ]]
    chamfer1_side_4 = [part.faces().sort_by_distance(p)[0] for p in [
        (-69.505959083, -7.62, -0.226399396),
    ]]
    chamfer1_edges_5 = [part.edges().sort_by_distance(p)[0] for p in [
        (-41.306879083, -8.89, -0.226399396),
    ]]
    chamfer1_side_5 = [part.faces().sort_by_distance(p)[0] for p in [
        (-41.306879083, -7.62, -0.226399396),
    ]]
    chamfer1_edges_6 = [part.edges().sort_by_distance(p)[0] for p in [
        (-34.956879083, -8.89, -0.226399396),
    ]]
    chamfer1_side_6 = [part.faces().sort_by_distance(p)[0] for p in [
        (-34.956879083, -7.62, -0.226399396),
    ]]
    chamfer1 = BRepFilletAPI_MakeChamfer(part.part.solid().wrapped)
    for e in chamfer1_edges_1:
        chamfer1.Add(CHAMFER1_SIZE, CHAMFER1_SIZE2, e.wrapped, chamfer1_side_1[0].wrapped)  # the first distance lies on this face
    for e in chamfer1_edges_2:
        chamfer1.Add(CHAMFER1_SIZE, CHAMFER1_SIZE2, e.wrapped, chamfer1_side_2[0].wrapped)  # the first distance lies on this face
    for e in chamfer1_edges_3:
        chamfer1.Add(CHAMFER1_SIZE, CHAMFER1_SIZE2, e.wrapped, chamfer1_side_3[0].wrapped)  # the first distance lies on this face
    for e in chamfer1_edges_4:
        chamfer1.Add(CHAMFER1_SIZE, CHAMFER1_SIZE2, e.wrapped, chamfer1_side_4[0].wrapped)  # the first distance lies on this face
    for e in chamfer1_edges_5:
        chamfer1.Add(CHAMFER1_SIZE, CHAMFER1_SIZE2, e.wrapped, chamfer1_side_5[0].wrapped)  # the first distance lies on this face
    for e in chamfer1_edges_6:
        chamfer1.Add(CHAMFER1_SIZE, CHAMFER1_SIZE2, e.wrapped, chamfer1_side_6[0].wrapped)  # the first distance lies on this face
    add(Compound.cast(chamfer1.Shape()), mode=Mode.REPLACE)

    # Sketch19 → Boss-Extrude11 (add, along a direction that is not the sketch's normal)
    with BuildSketch(Plane(origin=(0, -0.301230094, -5.747812595), x_dir=(-1, 0, 0), z_dir=(0, -0.052335956242940455, -0.9986295347545742))):
        with Locations((72.436737563, 35.222286287)):
            Rectangle(SKETCH19_W, SKETCH19_H)
        Polygon((77.357987563, 73.958157727), (77.357987563, 70.727642501), (124.87427188, 2.845129245), (132.235001715, 2.845129245), (82.457426933, 73.958157727), align=None)
        Polygon((67.225707879, 73.958157727), (41.990365712, 2.845129245), (35.590124494, 2.845129245), (60.82546666, 73.958157727), align=None)
    extrude(amount=-BOSS_EXTRUDE11_DEPTH, dir=(0, 0, -1))


solid = part.part
